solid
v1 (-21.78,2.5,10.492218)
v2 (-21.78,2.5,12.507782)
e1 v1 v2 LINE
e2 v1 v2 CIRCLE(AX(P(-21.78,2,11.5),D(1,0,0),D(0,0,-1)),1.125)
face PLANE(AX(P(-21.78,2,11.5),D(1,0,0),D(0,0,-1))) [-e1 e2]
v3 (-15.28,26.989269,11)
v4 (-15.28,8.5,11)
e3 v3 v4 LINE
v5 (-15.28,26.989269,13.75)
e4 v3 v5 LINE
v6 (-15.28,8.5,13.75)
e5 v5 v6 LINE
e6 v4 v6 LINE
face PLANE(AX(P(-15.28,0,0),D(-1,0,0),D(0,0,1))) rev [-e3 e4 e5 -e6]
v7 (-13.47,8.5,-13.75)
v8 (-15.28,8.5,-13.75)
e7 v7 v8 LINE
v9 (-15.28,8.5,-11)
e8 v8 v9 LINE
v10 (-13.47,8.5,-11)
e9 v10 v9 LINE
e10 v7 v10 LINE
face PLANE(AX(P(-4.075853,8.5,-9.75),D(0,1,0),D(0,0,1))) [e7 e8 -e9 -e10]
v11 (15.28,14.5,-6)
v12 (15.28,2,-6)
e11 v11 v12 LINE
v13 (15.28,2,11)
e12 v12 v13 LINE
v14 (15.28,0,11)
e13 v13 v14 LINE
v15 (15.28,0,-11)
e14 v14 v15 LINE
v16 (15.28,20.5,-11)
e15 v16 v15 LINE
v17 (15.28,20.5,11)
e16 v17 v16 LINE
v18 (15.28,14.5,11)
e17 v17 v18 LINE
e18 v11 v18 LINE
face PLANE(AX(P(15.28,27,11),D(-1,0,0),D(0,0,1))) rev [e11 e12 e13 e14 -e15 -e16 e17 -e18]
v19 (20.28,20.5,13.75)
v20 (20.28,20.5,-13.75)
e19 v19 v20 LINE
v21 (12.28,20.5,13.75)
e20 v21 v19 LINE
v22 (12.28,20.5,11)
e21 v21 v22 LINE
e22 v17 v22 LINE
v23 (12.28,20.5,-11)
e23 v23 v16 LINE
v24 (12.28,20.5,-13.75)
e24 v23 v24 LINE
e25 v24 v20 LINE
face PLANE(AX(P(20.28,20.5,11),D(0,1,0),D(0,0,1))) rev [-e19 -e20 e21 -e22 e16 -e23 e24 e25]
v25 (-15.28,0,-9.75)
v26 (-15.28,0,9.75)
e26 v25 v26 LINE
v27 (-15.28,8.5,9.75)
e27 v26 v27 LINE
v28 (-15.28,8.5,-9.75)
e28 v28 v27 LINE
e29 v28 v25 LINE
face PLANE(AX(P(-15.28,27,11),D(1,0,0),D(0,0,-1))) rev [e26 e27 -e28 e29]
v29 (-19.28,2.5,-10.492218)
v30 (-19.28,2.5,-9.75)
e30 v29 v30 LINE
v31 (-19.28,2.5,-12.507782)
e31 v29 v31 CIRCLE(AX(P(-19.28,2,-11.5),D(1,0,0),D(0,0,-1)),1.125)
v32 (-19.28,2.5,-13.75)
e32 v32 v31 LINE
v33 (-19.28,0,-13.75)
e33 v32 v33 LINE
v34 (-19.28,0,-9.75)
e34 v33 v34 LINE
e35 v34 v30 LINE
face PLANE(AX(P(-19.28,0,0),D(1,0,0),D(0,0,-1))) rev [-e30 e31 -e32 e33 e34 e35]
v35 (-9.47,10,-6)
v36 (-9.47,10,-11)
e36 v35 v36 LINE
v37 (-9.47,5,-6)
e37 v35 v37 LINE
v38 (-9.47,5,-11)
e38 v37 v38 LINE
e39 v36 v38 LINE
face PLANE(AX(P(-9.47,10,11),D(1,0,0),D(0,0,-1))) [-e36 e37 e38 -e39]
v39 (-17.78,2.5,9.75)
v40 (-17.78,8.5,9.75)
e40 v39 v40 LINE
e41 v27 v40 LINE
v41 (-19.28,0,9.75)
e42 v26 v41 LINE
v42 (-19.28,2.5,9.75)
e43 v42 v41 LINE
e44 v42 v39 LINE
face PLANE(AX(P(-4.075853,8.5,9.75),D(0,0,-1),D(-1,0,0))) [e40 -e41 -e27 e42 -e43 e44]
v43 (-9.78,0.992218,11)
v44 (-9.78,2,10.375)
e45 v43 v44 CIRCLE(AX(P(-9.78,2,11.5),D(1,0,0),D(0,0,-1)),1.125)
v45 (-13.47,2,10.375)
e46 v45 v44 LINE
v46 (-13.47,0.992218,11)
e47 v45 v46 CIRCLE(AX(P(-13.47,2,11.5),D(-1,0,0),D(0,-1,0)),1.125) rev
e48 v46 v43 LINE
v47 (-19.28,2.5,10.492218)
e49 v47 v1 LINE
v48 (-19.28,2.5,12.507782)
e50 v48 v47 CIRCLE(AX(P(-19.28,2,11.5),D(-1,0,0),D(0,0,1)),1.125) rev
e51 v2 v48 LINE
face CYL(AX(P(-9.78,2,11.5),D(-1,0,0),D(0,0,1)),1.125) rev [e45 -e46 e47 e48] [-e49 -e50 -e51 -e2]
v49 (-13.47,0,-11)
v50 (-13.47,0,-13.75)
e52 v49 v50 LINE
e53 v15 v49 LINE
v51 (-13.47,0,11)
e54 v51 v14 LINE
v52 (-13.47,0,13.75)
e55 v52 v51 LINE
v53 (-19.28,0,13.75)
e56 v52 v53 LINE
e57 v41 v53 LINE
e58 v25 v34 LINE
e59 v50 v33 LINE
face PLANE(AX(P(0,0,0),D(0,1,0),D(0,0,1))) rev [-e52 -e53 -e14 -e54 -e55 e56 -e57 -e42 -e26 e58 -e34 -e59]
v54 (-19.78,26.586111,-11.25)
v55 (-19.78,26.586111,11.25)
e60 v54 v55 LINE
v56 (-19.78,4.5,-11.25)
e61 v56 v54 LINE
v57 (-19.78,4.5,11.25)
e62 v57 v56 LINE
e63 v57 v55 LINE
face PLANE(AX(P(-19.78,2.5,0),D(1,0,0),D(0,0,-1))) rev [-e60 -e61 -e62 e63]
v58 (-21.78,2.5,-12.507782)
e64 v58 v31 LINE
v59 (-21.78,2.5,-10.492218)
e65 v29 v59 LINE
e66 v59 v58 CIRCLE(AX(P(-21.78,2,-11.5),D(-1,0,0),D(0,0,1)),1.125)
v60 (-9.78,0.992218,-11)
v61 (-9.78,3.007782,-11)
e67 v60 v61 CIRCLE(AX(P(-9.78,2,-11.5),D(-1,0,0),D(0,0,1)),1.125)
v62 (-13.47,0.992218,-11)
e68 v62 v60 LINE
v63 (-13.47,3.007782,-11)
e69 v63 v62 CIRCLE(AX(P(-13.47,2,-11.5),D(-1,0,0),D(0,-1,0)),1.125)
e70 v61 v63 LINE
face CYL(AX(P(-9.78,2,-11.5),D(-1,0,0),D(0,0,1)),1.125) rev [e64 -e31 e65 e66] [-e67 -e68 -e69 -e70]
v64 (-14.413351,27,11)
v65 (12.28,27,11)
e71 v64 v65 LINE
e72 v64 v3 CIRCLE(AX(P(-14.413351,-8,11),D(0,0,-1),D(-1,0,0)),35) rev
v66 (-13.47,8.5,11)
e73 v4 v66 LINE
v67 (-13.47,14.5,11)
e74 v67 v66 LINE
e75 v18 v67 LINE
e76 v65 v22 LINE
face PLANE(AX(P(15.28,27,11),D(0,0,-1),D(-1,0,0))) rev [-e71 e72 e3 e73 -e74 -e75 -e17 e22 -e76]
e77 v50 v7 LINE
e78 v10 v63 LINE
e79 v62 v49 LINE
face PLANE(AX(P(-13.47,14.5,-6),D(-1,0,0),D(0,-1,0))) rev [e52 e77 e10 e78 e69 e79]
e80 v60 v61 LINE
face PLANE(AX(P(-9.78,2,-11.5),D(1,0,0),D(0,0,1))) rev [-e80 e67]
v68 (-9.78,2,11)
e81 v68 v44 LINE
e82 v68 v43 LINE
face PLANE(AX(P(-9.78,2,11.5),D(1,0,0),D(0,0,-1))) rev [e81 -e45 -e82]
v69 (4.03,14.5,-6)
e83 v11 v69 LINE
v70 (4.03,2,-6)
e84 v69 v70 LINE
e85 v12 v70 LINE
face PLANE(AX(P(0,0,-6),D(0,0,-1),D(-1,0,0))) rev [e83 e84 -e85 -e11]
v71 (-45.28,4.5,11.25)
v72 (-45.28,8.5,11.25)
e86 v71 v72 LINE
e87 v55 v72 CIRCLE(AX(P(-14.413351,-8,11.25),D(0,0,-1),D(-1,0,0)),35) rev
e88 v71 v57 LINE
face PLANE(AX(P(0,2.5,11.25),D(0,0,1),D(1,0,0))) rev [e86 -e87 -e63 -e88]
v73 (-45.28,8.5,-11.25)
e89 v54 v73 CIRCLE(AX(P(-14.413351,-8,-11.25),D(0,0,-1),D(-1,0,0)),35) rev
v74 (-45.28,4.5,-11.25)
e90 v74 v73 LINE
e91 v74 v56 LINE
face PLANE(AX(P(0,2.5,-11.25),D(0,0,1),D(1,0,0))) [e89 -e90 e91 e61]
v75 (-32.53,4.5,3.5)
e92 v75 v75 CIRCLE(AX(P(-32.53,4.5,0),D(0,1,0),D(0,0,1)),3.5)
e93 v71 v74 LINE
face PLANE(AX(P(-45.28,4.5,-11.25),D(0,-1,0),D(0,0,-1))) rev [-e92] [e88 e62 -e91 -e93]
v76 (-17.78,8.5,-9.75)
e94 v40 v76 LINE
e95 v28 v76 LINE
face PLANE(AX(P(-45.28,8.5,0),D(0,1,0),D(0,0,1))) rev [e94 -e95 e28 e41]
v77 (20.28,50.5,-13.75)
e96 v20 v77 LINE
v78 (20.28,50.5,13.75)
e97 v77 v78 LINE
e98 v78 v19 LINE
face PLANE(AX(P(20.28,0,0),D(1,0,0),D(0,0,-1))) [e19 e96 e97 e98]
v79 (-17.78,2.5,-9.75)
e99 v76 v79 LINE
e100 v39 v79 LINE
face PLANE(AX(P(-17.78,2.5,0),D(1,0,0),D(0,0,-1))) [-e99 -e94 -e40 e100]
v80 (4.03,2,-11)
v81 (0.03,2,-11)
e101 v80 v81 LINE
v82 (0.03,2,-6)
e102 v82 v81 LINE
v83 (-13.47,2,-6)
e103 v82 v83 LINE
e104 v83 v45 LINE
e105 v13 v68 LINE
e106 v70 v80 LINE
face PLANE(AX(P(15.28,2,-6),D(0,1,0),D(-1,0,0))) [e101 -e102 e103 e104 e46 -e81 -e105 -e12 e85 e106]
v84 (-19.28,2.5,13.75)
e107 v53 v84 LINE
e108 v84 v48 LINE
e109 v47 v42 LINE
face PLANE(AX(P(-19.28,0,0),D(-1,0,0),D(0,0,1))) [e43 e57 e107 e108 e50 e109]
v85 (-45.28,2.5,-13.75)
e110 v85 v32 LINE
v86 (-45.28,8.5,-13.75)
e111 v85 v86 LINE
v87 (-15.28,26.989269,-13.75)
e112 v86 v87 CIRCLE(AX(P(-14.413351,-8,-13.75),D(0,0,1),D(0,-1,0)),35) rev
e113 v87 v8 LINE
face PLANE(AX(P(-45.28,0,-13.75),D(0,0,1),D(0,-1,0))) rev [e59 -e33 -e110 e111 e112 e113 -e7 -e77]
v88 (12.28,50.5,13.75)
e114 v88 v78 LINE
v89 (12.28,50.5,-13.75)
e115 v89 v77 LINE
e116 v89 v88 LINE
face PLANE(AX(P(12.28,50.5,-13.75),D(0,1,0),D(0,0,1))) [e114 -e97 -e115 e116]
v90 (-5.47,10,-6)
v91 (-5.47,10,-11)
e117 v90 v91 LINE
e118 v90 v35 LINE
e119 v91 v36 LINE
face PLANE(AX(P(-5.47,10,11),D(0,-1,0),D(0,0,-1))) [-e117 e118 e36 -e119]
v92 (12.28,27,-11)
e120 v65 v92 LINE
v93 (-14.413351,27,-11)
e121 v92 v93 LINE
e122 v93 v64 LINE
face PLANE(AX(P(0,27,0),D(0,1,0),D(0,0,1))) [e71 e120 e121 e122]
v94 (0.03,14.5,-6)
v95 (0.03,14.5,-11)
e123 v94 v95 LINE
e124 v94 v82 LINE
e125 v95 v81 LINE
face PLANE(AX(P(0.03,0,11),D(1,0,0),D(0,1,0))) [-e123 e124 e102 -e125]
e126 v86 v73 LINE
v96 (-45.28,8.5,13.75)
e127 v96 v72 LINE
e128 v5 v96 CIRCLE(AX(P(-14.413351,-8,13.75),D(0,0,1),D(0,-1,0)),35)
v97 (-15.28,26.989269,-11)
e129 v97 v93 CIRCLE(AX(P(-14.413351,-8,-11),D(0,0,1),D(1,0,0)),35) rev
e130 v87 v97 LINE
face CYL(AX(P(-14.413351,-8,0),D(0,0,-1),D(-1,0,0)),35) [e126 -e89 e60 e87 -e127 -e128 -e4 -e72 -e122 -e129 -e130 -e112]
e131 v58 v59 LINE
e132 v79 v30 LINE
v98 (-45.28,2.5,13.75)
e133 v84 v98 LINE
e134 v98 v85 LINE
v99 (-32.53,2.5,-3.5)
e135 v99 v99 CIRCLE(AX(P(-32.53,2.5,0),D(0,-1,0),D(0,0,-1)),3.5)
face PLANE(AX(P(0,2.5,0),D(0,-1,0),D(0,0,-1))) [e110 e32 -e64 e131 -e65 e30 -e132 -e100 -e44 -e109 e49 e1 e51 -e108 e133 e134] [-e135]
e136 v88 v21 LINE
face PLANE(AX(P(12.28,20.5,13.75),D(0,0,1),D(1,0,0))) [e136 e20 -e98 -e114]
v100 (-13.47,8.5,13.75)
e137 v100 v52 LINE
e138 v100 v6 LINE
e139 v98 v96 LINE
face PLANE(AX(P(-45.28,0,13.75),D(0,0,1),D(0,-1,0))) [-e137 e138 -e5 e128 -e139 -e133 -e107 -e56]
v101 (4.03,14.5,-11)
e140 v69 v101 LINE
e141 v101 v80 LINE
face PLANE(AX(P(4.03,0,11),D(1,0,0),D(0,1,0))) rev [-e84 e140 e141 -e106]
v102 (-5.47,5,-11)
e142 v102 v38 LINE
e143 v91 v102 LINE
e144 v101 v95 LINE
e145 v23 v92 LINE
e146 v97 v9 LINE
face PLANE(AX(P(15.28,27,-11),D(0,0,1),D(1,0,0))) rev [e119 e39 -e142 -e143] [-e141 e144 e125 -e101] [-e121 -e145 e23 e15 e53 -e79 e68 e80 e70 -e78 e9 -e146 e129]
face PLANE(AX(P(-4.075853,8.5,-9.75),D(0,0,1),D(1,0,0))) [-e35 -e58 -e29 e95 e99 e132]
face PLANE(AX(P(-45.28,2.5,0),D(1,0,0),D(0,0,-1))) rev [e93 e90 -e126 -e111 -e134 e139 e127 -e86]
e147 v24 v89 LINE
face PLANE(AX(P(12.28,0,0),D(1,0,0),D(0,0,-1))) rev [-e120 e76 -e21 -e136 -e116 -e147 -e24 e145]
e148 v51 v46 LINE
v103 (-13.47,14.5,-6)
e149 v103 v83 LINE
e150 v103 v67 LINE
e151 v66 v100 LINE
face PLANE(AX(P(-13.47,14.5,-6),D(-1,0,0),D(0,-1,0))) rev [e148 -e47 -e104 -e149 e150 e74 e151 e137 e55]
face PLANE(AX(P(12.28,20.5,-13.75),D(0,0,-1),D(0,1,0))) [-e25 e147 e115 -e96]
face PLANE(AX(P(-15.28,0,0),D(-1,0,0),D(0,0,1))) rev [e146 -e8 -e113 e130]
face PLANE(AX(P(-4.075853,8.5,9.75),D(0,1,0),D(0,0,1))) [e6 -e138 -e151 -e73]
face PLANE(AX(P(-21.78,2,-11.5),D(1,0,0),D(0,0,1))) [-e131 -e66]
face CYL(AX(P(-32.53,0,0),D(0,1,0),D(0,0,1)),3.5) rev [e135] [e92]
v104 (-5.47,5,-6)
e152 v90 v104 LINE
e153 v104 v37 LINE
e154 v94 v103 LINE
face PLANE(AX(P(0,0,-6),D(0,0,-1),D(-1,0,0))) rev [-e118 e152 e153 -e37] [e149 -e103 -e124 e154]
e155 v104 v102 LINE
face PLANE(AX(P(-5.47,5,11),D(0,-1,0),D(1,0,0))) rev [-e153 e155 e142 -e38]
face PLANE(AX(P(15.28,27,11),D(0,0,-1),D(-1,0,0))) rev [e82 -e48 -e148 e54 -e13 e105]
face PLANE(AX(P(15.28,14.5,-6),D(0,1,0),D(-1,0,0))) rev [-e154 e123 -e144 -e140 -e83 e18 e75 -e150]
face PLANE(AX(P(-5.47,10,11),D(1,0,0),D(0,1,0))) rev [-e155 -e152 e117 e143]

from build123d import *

# Parameters (mm, degrees)
SKETCH2_W                        = 30.56
SKETCH2_H                        = 22
BOSS_EXTRUDE1_DEPTH              = 27
SKETCH4_W                        = 28.75
SKETCH4_H                        = 12.5
CUT_EXTRUDE1_DEPTH               = 17
SKETCH5_W                        = 4
SKETCH5_H                        = 12.5
SKETCH5_H_2                      = 5
CUT_EXTRUDE2_DEPTH               = 39.032596546
SKETCH9_W                        = 27.5
SKETCH9_H                        = 18.5
BOSS_EXTRUDE2_DEPTH              = 30
FILLET1_R                        = 35
BOSS_EXTRUDE3_DEPTH              = 6
SKETCH10_6_W                     = 25.5
SKETCH10_6_H                     = 22.5
CUT_EXTRUDE3_DEPTH               = 51.80935839
SKETCH13_W                       = 22.5
SKETCH13_H                       = 2
BOSS_EXTRUDE4_DEPTH              = 25.5
SKETCH14_R                       = 3.5
CUT_EXTRUDE4_DEPTH               = 53.398386426
SKETCH20_W                       = 4
SKETCH20_H                       = 8.5
BOSS_EXTRUDE13_DEPTH             = 4
BOSS_EXTRUDE13_DIRECTION_2_REACH = 45.035
CUT_EXTRUDE5_START               = -4
SKETCH15_R                       = 1.125
CUT_EXTRUDE5_DEPTH               = 12
SKETCH21_W                       = 22
SKETCH21_H                       = 6.5
BOSS_EXTRUDE14_DEPTH             = 5
SKETCH22_W                       = 27.5
SKETCH22_H                       = 30
BOSS_EXTRUDE15_DEPTH             = 8


with BuildPart() as part:
    # Sketch2 → Boss-Extrude1 (new body)
    with BuildSketch(Plane(origin=(0, 0, 0), x_dir=(1, 0, 0), z_dir=(0, 1, 0))):
        Rectangle(SKETCH2_W, SKETCH2_H)
    extrude(amount=BOSS_EXTRUDE1_DEPTH)

    # Sketch4 → Cut-Extrude1 (cut)
    with BuildSketch(Plane.XY.offset(11)):
        with Locations((0.905, 8.25)):
            Rectangle(SKETCH4_W, SKETCH4_H)
    extrude(amount=-CUT_EXTRUDE1_DEPTH, mode=Mode.SUBTRACT)

    # Sketch5 → Cut-Extrude2 (cut, through all)
    with BuildSketch(Plane(origin=(0, 0, -11), x_dir=(-1, 0, 0), z_dir=(0, 0, -1))):
        with Locations((-2.03, 8.25)):
            Rectangle(SKETCH5_W, SKETCH5_H)
        with Locations((7.47, 7.5)):
            Rectangle(SKETCH5_W, SKETCH5_H_2)
    extrude(amount=-CUT_EXTRUDE2_DEPTH, mode=Mode.SUBTRACT)

    # Sketch9 → Boss-Extrude2 (add)
    with BuildSketch(Plane.ZY.offset(15.28)):
        with Locations((0, 17.75)):
            Rectangle(SKETCH9_W, SKETCH9_H)
    extrude(amount=BOSS_EXTRUDE2_DEPTH)

    # Fillet1
    # the kernel refuses this fillet: 35 mm, written as the material it takes off along each edge
    with BuildSketch(Plane(origin=(-45.28, 27, -90.91662167), x_dir=(1, 0, 0), z_dir=(0, 0, 1))) as fillet1_piece_1:
        with BuildLine():
            CenterArc((30.866648668, -35), FILLET1_R, 90, 61.872931781)
            Line((0, -18.5), (-0.617332973, -18.17))
            ThreePointArc((-0.617332973, -18.17), (-0.7, -9.25), (-0.7, 0))
            Line((-0.7, 0), (0, 0.7))
            Line((0, 0.7), (30.866648668, 0.7))
            Line((30.866648668, 0.7), (30.866648668, 0))
        make_face()
    extrude(amount=181.833243341, mode=Mode.SUBTRACT)

    # Sketch10 → Boss-Extrude3 (add)
    with BuildSketch(Plane.XZ.offset(-8.5)):
        Polygon((-45.28, 13.75), (-45.28, 11.25), (-19.78, 11.25), (-19.78, -11.25), (-45.28, -11.25), (-45.28, -13.75), (-17.78, -13.75), (-17.78, 13.75), align=None)
    extrude(amount=BOSS_EXTRUDE3_DEPTH)

    # Sketch10<6> → Cut-Extrude3 (cut, through all)
    with BuildSketch(Plane.XZ.offset(-8.5)):
        with Locations((-32.53, 0)):
            Rectangle(SKETCH10_6_W, SKETCH10_6_H)
    extrude(amount=-CUT_EXTRUDE3_DEPTH, mode=Mode.SUBTRACT)

    # Sketch13 → Boss-Extrude4 (add)
    with BuildSketch(Plane.ZY.offset(19.78)):
        with Locations((0, 3.5)):
            Rectangle(SKETCH13_W, SKETCH13_H)
    extrude(amount=BOSS_EXTRUDE4_DEPTH)

    # Sketch14 → Cut-Extrude4 (cut, through all)
    with BuildSketch(Plane(origin=(0, 4.5, 0), x_dir=(1, 0, 0), z_dir=(0, 1, 0))):
        with Locations(Location((-32.53, 0, 0), (0, 0, 270))):
            Circle(SKETCH14_R)
    extrude(amount=-CUT_EXTRUDE4_DEPTH, mode=Mode.SUBTRACT)

    # Sketch20 → Boss-Extrude13 (add)
    with BuildSketch(Plane.ZY.offset(15.28)):
        with Locations((11.75, 4.25)):
            Rectangle(SKETCH20_W, SKETCH20_H)
        with Locations((-11.75, 4.25)):
            Rectangle(SKETCH20_W, SKETCH20_H)
    extrude(amount=BOSS_EXTRUDE13_DEPTH)

    # Boss-Extrude13 direction 2: up to this face of the body (flat: up to its plane)
    boss_extrude13_direction_2_end = Plane(part.part.faces().sort_by_distance((-13.47, 8.25, 2.5))[0])
    # Sketch20 → Boss-Extrude13 direction 2 (add, up to the picked face)
    with BuildSketch(Plane.ZY.offset(15.28), mode=Mode.PRIVATE) as boss_extrude13_direction_2_sk1:
        with Locations((11.75, 4.25)):
            Rectangle(SKETCH20_W, SKETCH20_H)
    boss_extrude13_direction_2_tool1 = split(extrude(boss_extrude13_direction_2_sk1.sketch, amount=-BOSS_EXTRUDE13_DIRECTION_2_REACH, mode=Mode.PRIVATE), bisect_by=boss_extrude13_direction_2_end, keep=Keep.BOTH, mode=Mode.PRIVATE)
    # Sketch20 → Boss-Extrude13 direction 2 (add, up to the picked face)
    with BuildSketch(Plane.ZY.offset(15.28), mode=Mode.PRIVATE) as boss_extrude13_direction_2_sk2:
        with Locations((-11.75, 4.25)):
            Rectangle(SKETCH20_W, SKETCH20_H)
    boss_extrude13_direction_2_tool2 = split(extrude(boss_extrude13_direction_2_sk2.sketch, amount=-BOSS_EXTRUDE13_DIRECTION_2_REACH, mode=Mode.PRIVATE), bisect_by=boss_extrude13_direction_2_end, keep=Keep.BOTH, mode=Mode.PRIVATE)
    add(boss_extrude13_direction_2_tool1.solids().sort_by(Axis((-15.28, 4.25, 11.75), (1, 0, 0)))[0])
    add(boss_extrude13_direction_2_tool2.solids().sort_by(Axis((-15.28, 4.25, -11.75), (1, 0, 0)))[0])

    # Sketch15 → Cut-Extrude5 (cut)
    with BuildSketch(Plane(origin=(-17.78, 0, 0), x_dir=(0, 0, -1), z_dir=(1, 0, 0)).offset(CUT_EXTRUDE5_START)):
        with Locations(Location((-11.5, 2, 0), (0, 0, 153.612200039))):
            Circle(SKETCH15_R)
    cut_extrude5 = extrude(amount=CUT_EXTRUDE5_DEPTH, mode=Mode.SUBTRACT)

    # Mirror3: Cut-Extrude5 across plane
    add(cut_extrude5.mirror(Plane.XY), mode=Mode.SUBTRACT)

    # Sketch21 → Boss-Extrude14 (add)
    with BuildSketch(Plane(origin=(15.28, 0, 0), x_dir=(0, 0, -1), z_dir=(1, 0, 0))):
        with Locations((0, 23.75)):
            Rectangle(SKETCH21_W, SKETCH21_H)
    extrude(amount=BOSS_EXTRUDE14_DEPTH)

    # Sketch22 → Boss-Extrude15 (add)
    with BuildSketch(Plane(origin=(20.28, 0, 0), x_dir=(0, 0, -1), z_dir=(1, 0, 0))):
        with Locations((0, 35.5)):
            Rectangle(SKETCH22_W, SKETCH22_H)
    extrude(amount=-BOSS_EXTRUDE15_DEPTH)


solid = part.part
